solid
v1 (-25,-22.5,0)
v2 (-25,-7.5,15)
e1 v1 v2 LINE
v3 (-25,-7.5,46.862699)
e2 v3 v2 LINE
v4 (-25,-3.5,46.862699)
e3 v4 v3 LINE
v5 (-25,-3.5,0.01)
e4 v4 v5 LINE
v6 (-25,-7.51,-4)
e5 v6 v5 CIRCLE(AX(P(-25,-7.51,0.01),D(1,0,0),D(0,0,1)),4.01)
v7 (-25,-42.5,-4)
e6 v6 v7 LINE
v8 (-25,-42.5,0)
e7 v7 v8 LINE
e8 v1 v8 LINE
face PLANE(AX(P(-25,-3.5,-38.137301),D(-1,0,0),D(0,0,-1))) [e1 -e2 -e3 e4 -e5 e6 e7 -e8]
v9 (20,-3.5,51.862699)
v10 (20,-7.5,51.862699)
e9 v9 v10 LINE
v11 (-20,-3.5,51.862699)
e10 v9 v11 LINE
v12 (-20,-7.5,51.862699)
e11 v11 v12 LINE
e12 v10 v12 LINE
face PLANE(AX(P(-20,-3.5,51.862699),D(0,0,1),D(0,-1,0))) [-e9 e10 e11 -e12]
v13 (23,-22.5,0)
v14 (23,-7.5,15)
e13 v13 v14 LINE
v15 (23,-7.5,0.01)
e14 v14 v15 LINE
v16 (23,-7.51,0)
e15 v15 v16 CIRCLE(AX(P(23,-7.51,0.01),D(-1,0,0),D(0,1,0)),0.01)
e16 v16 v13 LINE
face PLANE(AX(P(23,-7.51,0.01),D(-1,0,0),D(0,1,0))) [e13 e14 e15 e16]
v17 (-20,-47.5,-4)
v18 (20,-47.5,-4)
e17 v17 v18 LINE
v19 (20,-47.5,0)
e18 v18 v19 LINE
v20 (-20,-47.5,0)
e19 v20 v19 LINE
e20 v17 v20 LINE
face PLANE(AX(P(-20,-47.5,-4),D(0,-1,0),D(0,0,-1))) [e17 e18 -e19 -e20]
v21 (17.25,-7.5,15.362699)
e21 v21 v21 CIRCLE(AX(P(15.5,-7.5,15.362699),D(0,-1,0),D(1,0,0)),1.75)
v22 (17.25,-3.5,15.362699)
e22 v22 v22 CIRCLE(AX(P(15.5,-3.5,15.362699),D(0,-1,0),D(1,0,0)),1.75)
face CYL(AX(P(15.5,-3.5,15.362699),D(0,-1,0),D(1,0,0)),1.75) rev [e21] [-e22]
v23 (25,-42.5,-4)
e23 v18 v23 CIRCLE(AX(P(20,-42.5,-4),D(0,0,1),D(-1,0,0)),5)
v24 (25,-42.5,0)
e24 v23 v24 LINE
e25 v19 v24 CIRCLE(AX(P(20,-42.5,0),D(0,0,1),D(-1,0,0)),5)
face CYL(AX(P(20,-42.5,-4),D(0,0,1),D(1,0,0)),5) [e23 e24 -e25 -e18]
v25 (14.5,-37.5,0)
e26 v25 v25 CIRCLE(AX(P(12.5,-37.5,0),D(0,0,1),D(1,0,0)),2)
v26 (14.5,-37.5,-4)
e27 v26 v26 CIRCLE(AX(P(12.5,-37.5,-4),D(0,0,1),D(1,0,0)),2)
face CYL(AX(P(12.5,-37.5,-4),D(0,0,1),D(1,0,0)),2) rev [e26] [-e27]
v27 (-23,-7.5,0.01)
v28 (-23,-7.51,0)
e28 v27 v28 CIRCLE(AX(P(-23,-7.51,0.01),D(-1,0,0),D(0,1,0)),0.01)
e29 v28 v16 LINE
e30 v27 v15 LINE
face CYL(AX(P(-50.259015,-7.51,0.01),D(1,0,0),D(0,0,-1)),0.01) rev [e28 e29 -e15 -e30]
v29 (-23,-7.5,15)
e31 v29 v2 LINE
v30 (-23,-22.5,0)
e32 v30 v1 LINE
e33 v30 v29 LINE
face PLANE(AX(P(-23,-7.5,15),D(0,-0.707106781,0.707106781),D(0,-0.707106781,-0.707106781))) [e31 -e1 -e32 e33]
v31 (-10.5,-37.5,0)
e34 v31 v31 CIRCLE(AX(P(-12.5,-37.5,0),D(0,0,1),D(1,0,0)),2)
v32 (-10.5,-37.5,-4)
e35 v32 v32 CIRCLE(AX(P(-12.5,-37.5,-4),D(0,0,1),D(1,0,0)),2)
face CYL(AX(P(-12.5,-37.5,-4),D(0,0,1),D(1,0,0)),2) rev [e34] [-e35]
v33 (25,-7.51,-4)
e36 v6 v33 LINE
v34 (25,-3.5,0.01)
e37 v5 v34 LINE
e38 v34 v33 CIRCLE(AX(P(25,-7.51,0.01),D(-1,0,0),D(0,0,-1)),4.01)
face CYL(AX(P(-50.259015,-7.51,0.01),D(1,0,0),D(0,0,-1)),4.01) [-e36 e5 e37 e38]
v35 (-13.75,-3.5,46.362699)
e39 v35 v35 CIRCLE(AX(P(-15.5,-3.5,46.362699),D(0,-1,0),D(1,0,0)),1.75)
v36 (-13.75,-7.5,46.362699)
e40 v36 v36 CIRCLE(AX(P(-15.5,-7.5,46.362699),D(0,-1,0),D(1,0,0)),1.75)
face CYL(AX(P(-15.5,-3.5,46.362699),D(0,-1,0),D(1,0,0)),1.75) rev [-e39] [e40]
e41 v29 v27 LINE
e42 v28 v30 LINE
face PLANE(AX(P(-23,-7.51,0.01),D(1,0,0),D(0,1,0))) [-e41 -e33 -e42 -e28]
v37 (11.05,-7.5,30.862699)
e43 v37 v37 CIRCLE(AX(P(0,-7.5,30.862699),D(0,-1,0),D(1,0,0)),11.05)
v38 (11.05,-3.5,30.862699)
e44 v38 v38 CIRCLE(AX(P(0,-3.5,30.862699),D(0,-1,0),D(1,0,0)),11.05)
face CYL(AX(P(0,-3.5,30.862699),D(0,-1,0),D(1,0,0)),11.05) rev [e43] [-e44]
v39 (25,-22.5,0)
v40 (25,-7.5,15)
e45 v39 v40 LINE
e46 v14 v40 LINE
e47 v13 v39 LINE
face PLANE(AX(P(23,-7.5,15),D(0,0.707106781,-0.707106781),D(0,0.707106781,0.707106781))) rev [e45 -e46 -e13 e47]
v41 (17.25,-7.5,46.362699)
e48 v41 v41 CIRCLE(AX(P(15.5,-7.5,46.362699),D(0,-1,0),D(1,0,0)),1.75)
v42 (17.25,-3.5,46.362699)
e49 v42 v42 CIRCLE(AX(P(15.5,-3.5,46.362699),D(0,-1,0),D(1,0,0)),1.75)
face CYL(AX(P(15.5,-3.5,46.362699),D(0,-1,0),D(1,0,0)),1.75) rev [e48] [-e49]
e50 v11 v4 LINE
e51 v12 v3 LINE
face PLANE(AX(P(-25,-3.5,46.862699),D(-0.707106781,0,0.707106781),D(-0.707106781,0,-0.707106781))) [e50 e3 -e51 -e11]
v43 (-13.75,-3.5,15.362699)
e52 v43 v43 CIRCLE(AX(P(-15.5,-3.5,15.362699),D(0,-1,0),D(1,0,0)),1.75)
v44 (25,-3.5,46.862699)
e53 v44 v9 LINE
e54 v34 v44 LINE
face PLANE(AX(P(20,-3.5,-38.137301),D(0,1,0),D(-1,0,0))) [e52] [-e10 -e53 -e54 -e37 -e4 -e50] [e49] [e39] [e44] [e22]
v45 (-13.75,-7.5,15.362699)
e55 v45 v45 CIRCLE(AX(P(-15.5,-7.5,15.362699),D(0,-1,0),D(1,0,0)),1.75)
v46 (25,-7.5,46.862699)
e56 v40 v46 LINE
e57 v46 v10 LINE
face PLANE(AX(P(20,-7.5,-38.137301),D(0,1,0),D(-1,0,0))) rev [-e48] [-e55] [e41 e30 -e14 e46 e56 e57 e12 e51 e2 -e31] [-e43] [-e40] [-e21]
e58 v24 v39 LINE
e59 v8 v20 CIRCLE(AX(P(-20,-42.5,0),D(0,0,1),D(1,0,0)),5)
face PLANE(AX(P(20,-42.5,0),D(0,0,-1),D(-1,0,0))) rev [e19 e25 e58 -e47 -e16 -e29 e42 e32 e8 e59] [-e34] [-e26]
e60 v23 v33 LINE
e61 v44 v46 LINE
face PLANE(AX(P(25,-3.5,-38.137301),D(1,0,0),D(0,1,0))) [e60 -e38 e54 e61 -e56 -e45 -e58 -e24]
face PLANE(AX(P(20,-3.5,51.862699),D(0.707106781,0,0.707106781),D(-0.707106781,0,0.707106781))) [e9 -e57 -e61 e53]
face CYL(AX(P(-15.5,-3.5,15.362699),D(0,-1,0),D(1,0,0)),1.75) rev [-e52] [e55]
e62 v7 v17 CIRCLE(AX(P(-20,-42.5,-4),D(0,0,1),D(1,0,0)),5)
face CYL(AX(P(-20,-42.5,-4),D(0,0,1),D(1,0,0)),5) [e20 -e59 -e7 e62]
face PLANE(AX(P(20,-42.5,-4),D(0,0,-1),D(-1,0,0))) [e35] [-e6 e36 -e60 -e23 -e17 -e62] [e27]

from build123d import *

# Parameters (mm, degrees)
SCHIZZO1_R                             = 1.75
SCHIZZO1_R_2                           = 11.05
SCHIZZO1_R_3                           = 2
BASE_FLANGIA1_DEPTH                    = 4
PIEGATURA_START                        = -3.5
PIEGATURA_DELLO_SCHIZZO1_OUTLINE_W     = 50
PIEGATURA_DELLO_SCHIZZO1_OUTLINE_H     = 4
PIEGATURA_DELLO_SCHIZZO1_DEPTH         = 51
PIEGATURA_START_2                      = -7.5
PIEGATURA_DELLO_SCHIZZO1_2_OUTLINE_R   = 1.75
PIEGATURA_DELLO_SCHIZZO1_2_OUTLINE_R_2 = 11.05
PIEGATURA_DELLO_SCHIZZO1_2_DEPTH       = 4
PIEGATURA_START_3                      = -26
PIEGATURA_DELLO_SCHIZZO1_3_DEPTH       = 52
PIEGATURA_START_4                      = -25
PIEGATURA_DELLO_SCHIZZO1_4_DEPTH       = 50
ESTRUSIONE_ESTRUSIONE1_DEPTH           = 2


with BuildPart() as part:
    # Base-Flangia1: sheet metal written as solids
    # Schizzo1 → Base-Flangia1 (new body)
    with BuildSketch(Plane.XY):
        with BuildLine():
            Line((-25, 42.5), (-20, 47.5))
            Line((-20, 47.5), (20, 47.5))
            Line((20, 47.5), (25, 42.5))
            Line((25, 42.5), (25, -42.5))
            ThreePointArc((25, -42.5), (23.535533906, -46.035533906), (20, -47.5))
            Line((20, -47.5), (-20, -47.5))
            ThreePointArc((-20, -47.5), (-23.535533906, -46.035533906), (-25, -42.5))
            Line((-25, -42.5), (-25, 42.5))
        make_face()
        with Locations((-15.5, 42)):
            Circle(SCHIZZO1_R, mode=Mode.SUBTRACT)
        with Locations((15.5, 42)):
            Circle(SCHIZZO1_R, mode=Mode.SUBTRACT)
        with Locations((15.5, 11)):
            Circle(SCHIZZO1_R, mode=Mode.SUBTRACT)
        with Locations((-15.5, 11)):
            Circle(SCHIZZO1_R, mode=Mode.SUBTRACT)
        with Locations((0, 26.5)):
            Circle(SCHIZZO1_R_2, mode=Mode.SUBTRACT)
        with Locations((-12.5, -37.5)):
            Circle(SCHIZZO1_R_3, mode=Mode.SUBTRACT)
        with Locations((12.5, -37.5)):
            Circle(SCHIZZO1_R_3, mode=Mode.SUBTRACT)
    extrude(amount=-BASE_FLANGIA1_DEPTH)

    # Piegatura dello schizzo1: read off the stored shape, not the designer's step
    # Piegatura dello schizzo1 outline → Piegatura dello schizzo1 (cut)
    with BuildSketch(Plane(origin=(0, 0, 0), x_dir=(1, 0, 0), z_dir=(0, 1, 0)).offset(PIEGATURA_START)):
        with Locations((0, 2)):
            Rectangle(PIEGATURA_DELLO_SCHIZZO1_OUTLINE_W, PIEGATURA_DELLO_SCHIZZO1_OUTLINE_H)
    extrude(amount=PIEGATURA_DELLO_SCHIZZO1_DEPTH, mode=Mode.SUBTRACT)

    # Piegatura dello schizzo1 2 outline → Piegatura dello schizzo1 2 (add)
    with BuildSketch(Plane(origin=(0, 0, 0), x_dir=(1, 0, 0), z_dir=(0, 1, 0)).offset(PIEGATURA_START_2)):
        Polygon((-25, 0), (-25, -46.862699383), (-20, -51.862699383), (20, -51.862699383), (25, -46.862699383), (25, 0), align=None)
        with Locations((-15.5, -46.362699383)):
            Circle(PIEGATURA_DELLO_SCHIZZO1_2_OUTLINE_R, mode=Mode.SUBTRACT)
        with Locations((15.5, -46.362699383)):
            Circle(PIEGATURA_DELLO_SCHIZZO1_2_OUTLINE_R, mode=Mode.SUBTRACT)
        with Locations((0, -30.862699383)):
            Circle(PIEGATURA_DELLO_SCHIZZO1_2_OUTLINE_R_2, mode=Mode.SUBTRACT)
        with Locations((-15.5, -15.362699383)):
            Circle(PIEGATURA_DELLO_SCHIZZO1_2_OUTLINE_R, mode=Mode.SUBTRACT)
        with Locations((15.5, -15.362699383)):
            Circle(PIEGATURA_DELLO_SCHIZZO1_2_OUTLINE_R, mode=Mode.SUBTRACT)
    extrude(amount=PIEGATURA_DELLO_SCHIZZO1_2_DEPTH)

    # Piegatura dello schizzo1 3 outline → Piegatura dello schizzo1 3 (cut)
    with BuildSketch(Plane.YZ.offset(PIEGATURA_START_3)):
        with BuildLine():
            ThreePointArc((-3.5, 0.01), (-4.674501807, -2.825498193), (-7.51, -4))
            Line((-7.51, -4), (-3.5, -4))
            Line((-3.5, -4), (-3.5, 0.01))
        make_face()
    extrude(amount=PIEGATURA_DELLO_SCHIZZO1_3_DEPTH, mode=Mode.SUBTRACT)

    # Piegatura dello schizzo1 4 outline → Piegatura dello schizzo1 4 (add)
    with BuildSketch(Plane.YZ.offset(PIEGATURA_START_4)):
        with BuildLine():
            ThreePointArc((-7.5, 0.01), (-7.502928932, 0.002928932), (-7.51, 0))
            Line((-7.51, 0), (-7.5, 0))
            Line((-7.5, 0), (-7.5, 0.01))
        make_face()
    extrude(amount=PIEGATURA_DELLO_SCHIZZO1_4_DEPTH)

    # Schizzo13 → Estrusione-Estrusione1 (add)
    with BuildSketch(Plane.ZY.offset(25)):
        with BuildLine():
            Line((0.01, -7.5), (15, -7.5))
            Line((15, -7.5), (0, -22.5))
            Line((0, -22.5), (0, -7.51))
            ThreePointArc((0, -7.51), (0.002928932, -7.502928932), (0.01, -7.5))
        make_face()
    estrusione_estrusione1 = extrude(amount=-ESTRUSIONE_ESTRUSIONE1_DEPTH)

    # Specchia1: Estrusione-Estrusione1 across plane
    add(estrusione_estrusione1.mirror(Plane(origin=(0, 0, 0), x_dir=(0, 0, 1), z_dir=(1, 0, 0))))


solid = part.part
